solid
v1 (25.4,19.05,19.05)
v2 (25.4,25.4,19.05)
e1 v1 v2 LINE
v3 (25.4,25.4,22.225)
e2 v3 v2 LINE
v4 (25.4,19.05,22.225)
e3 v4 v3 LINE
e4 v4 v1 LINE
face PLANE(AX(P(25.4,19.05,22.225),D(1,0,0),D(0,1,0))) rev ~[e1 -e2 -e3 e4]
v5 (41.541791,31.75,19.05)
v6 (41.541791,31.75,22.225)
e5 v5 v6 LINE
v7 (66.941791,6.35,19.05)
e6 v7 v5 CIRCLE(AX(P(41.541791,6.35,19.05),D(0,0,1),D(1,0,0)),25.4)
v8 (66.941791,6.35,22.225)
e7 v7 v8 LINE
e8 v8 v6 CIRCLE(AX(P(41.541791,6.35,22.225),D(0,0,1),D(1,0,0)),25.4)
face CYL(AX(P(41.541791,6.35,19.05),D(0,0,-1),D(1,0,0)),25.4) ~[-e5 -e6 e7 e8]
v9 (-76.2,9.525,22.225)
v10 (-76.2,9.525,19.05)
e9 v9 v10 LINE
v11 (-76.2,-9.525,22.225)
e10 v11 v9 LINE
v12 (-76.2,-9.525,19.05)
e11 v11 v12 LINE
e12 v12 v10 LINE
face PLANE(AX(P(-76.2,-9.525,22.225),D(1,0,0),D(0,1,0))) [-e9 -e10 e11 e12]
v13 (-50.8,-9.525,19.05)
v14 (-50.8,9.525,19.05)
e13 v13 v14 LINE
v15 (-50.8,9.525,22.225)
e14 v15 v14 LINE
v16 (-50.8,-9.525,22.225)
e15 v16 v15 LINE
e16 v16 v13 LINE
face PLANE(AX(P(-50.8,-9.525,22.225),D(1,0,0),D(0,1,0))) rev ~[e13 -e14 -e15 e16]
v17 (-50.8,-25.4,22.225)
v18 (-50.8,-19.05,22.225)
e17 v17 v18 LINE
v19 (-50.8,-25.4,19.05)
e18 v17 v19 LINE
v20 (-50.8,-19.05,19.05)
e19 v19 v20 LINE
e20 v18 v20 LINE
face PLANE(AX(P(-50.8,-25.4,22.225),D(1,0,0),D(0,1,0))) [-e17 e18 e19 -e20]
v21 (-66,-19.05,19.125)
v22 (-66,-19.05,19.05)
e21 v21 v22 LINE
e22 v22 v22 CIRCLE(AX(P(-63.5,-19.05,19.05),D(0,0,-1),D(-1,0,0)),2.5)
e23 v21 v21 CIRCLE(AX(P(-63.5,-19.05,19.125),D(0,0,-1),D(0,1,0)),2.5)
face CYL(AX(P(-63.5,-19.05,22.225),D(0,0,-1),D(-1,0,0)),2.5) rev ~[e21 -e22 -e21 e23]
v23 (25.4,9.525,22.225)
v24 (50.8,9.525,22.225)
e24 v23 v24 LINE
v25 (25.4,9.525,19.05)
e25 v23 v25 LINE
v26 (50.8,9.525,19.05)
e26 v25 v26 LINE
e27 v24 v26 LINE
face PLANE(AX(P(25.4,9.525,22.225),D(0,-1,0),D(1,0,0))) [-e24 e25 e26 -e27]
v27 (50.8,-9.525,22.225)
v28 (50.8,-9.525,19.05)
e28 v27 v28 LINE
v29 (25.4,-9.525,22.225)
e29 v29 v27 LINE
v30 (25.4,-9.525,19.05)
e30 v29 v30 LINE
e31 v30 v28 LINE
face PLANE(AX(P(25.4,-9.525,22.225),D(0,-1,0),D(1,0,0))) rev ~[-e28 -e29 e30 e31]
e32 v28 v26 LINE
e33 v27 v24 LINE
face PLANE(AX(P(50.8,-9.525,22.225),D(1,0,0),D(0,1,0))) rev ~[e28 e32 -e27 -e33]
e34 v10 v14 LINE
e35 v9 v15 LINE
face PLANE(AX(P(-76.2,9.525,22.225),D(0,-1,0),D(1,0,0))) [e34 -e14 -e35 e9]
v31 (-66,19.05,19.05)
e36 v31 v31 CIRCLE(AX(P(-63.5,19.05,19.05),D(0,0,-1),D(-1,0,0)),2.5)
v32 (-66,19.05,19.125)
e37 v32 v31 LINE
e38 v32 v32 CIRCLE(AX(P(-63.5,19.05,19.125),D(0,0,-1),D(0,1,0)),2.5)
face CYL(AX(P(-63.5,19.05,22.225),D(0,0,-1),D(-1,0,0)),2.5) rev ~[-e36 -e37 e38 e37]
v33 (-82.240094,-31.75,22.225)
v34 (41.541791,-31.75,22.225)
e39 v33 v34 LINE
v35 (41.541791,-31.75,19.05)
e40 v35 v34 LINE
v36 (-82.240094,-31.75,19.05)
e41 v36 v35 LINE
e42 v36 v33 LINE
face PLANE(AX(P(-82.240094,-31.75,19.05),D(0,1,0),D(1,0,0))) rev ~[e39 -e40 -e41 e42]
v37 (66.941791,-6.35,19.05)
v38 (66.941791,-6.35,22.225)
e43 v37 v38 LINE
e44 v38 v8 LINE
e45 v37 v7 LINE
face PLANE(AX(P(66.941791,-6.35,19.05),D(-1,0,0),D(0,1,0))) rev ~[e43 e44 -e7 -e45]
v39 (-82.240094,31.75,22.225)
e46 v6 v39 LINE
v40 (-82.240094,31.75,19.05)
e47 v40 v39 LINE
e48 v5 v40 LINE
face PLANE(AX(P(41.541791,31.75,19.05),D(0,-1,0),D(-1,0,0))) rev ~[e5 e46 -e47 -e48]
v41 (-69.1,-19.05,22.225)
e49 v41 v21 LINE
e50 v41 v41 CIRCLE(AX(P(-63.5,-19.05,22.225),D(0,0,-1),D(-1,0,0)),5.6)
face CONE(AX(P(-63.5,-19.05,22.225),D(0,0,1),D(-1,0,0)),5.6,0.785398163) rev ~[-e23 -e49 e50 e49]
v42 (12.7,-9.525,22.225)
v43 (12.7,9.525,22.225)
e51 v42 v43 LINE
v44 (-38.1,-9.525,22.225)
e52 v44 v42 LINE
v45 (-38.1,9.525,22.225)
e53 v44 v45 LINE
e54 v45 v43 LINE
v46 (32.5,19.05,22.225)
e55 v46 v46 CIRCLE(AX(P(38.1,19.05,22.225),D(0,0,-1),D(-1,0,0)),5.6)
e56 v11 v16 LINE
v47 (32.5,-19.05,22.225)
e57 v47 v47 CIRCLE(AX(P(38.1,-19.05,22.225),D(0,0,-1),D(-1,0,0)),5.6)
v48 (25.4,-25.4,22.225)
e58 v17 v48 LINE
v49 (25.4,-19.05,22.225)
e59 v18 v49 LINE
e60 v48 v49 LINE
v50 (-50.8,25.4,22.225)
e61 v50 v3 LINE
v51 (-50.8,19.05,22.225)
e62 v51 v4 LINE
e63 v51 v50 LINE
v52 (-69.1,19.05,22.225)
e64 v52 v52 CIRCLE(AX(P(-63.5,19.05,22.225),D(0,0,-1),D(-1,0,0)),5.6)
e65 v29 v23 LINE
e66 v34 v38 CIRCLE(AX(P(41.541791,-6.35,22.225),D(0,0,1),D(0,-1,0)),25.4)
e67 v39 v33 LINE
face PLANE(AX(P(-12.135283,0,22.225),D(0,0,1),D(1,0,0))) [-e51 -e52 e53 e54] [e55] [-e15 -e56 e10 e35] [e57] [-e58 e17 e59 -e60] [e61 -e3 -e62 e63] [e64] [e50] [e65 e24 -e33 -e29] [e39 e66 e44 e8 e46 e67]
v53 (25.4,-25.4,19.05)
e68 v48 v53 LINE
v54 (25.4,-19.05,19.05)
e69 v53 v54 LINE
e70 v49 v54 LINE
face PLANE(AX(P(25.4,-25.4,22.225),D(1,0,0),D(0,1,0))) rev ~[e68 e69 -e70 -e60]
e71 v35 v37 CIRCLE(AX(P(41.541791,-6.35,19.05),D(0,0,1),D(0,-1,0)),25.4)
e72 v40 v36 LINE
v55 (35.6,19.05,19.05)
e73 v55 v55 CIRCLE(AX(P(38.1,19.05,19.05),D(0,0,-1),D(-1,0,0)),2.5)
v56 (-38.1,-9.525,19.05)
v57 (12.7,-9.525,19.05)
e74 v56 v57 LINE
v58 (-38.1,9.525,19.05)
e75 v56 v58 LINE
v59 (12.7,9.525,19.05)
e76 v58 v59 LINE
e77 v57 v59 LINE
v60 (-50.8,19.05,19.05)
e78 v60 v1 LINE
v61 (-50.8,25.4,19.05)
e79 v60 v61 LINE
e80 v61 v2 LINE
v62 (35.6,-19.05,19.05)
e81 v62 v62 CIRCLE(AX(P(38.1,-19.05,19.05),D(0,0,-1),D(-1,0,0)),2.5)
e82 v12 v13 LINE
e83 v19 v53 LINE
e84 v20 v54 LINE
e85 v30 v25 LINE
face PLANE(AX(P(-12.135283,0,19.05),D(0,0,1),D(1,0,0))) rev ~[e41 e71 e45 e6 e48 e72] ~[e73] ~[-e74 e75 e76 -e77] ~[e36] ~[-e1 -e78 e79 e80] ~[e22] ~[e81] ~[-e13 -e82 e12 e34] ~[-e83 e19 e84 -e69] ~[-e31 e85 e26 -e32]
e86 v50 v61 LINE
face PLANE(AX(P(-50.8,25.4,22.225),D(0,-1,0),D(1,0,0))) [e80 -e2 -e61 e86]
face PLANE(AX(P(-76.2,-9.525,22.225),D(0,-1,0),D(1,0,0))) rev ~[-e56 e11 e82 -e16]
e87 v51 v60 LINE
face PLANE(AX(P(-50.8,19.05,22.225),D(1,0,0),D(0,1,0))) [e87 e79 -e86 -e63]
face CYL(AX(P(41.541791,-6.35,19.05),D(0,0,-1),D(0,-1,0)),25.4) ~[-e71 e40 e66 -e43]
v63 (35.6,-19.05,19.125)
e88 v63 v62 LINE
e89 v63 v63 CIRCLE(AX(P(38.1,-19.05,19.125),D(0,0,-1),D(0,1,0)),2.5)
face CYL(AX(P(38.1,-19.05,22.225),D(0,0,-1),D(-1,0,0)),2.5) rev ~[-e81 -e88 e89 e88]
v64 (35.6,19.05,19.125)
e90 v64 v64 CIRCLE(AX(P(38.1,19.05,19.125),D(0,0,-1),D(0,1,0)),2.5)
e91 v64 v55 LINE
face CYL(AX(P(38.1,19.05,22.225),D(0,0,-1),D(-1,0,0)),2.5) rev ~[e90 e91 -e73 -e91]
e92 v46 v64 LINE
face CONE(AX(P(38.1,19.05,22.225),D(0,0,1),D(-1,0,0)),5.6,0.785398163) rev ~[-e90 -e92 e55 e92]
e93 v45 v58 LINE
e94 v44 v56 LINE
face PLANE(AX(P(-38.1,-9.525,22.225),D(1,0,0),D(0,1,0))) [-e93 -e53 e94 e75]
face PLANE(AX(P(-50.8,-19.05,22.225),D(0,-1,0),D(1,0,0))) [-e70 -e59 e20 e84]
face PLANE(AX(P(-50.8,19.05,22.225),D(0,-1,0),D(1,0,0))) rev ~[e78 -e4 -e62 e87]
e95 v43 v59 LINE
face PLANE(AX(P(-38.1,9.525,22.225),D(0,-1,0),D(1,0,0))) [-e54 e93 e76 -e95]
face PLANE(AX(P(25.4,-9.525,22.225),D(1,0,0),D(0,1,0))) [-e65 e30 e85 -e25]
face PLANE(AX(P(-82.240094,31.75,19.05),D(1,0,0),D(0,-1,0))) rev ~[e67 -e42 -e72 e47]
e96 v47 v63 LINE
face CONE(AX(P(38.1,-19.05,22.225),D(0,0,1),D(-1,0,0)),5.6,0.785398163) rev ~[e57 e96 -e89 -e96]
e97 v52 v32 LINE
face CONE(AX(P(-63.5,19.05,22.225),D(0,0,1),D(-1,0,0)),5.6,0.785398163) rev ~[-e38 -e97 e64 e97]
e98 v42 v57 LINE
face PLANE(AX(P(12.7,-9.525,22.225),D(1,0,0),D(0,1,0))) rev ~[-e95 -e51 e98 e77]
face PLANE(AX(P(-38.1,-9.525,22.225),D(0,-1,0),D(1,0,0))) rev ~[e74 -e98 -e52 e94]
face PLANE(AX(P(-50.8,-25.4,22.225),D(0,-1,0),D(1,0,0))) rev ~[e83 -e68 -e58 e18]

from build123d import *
from build123d import SkipClean  # not in build123d's __all__

# Parameters (mm, degrees)
F1_DEPTH        = 31.75
F1_DEPTH_BACK   = 31.75
F3_R            = 6.35
F4_DEPTH        = 149.1828857926
F5_R            = 12.7
F6_DEPTH        = 25.4
F7_R            = 9.525
F8_DEPTH        = 44.45
F8_DEPTH_BACK   = 66.9427915833
F10_D           = 4.2
F10_DEPTH       = 25.4
F10_TIP         = 1.2618073
F12_DEPTH       = 3.175
F14_D           = 5
F14_CSINK_D     = 11.2
F14_CSINK_ANGLE = 90
F15_W           = 25.4
F15_H           = 19.05
F15_W_2         = 76.2
F15_H_2         = 6.35
F15_W_3         = 50.8
F16_DEPTH       = 41.2760001


# Not quite as in the source:
# - a feature of the source that left no trace in its solid (it failed there, or was rolled back) is left out


with BuildPart() as f1:
    # F0 (on Front) → F1 (new body, two sides)
    with BuildSketch(Plane.XZ) as f1_sk:
        with BuildLine():
            Line((66.9417914833, 19.05), (-82.2400942093, 19.05))
            Line((-82.2400942093, 19.05), (-82.2400942093, -19.05))
            add(Edge.make_bspline(
                [(-82.2400942093, -19.05), (0, -19.05), (66.9417914833, -19.05), (66.9417914833, 19.05)],
                knots=[0, 0, 0, 0, 153.970273166, 153.970273166, 153.970273166, 153.970273166], degree=3))
        make_face()
    extrude(amount=F1_DEPTH)
    extrude(f1_sk.sketch, amount=-F1_DEPTH_BACK)

    # F3 (on face) → F4 (cut, through all)
    with BuildSketch(Plane(origin=(-82.2400942093, 0, 0), x_dir=(0, -1, 0), z_dir=(-1, 0, 0))):
        Circle(F3_R)
    extrude(amount=-F4_DEPTH, mode=Mode.SUBTRACT)

    # F5 (on face) → F6 (cut)
    with BuildSketch(Plane(origin=(-82.2400942093, 0, 0), x_dir=(0, -1, 0), z_dir=(-1, 0, 0))):
        Circle(F5_R)
    extrude(amount=-F6_DEPTH, mode=Mode.SUBTRACT)

    # F7 (on Right) → F8 (cut, two sides)
    with BuildSketch(Plane.YZ) as f8_sk:
        Circle(F7_R)
    extrude(amount=-F8_DEPTH, mode=Mode.SUBTRACT)
    extrude(f8_sk.sketch, amount=F8_DEPTH_BACK, mode=Mode.SUBTRACT)

    # F10
    with Locations(Plane.XY.offset(19.05)):
        with Locations((-63.5, 19.05), (-63.5, -19.05), (25.4, 19.05), (25.4, -19.05)):
            Hole(F10_D / 2, depth=F10_DEPTH)
            with Locations((0, 0, -(F10_DEPTH + F10_TIP / 2))):  # 118° drill point
                Cone(0, F10_D / 2, F10_TIP, mode=Mode.SUBTRACT)


with BuildPart() as f12:
    # F11 (on face) → F12 (new body)
    with BuildSketch(Plane.XY.offset(19.05)):
        with BuildLine():
            Line((41.5417914833, 31.75), (-82.2400942093, 31.75))
            Line((-82.2400942093, 31.75), (-82.2400942093, -31.75))
            Line((-82.2400942093, -31.75), (41.5417914833, -31.75))
            ThreePointArc((41.5417914833, -31.75), (59.5023037254, -24.3105122421), (66.9417914833, -6.35))
            Line((66.9417914833, -6.35), (66.9417914833, 6.35))
            ThreePointArc((66.9417914833, 6.35), (59.5023037254, 24.3105122421), (41.5417914833, 31.75))
        make_face()
    extrude(amount=F12_DEPTH)

    # F14 (through all)
    with Locations(Plane.XY.offset(22.225)):
        with Locations((-63.5, 19.05), (-63.5, -19.05), (38.1, -19.05), (38.1, 19.05)):
            CounterSinkHole(F14_D / 2, F14_CSINK_D / 2, counter_sink_angle=F14_CSINK_ANGLE)


with BuildPart() as f16_tool:
    # F15 (on face) → F16 (new body, through all)
    with BuildSketch(Plane.XY.offset(22.225)):
        with Locations((-63.5, 0)):
            Rectangle(F15_W, F15_H)
        with Locations((38.1, 0)):
            Rectangle(F15_W, F15_H)
        with Locations((-12.7, 22.225)):
            Rectangle(F15_W_2, F15_H_2)
        with Locations((-12.7, -22.225)):
            Rectangle(F15_W_2, F15_H_2)
        with Locations((-12.7, 0)):
            Rectangle(F15_W_3, F15_H)
    extrude(amount=-F16_DEPTH)


with BuildPart() as f1_1:
    add(f1.part, clean=False)

    # F16: cut by f16_tool
    with SkipClean():  # cleaning this boolean's faces spoils the solid; the shape is the same uncleaned
        add(f16_tool.part, mode=Mode.SUBTRACT)


with BuildPart() as f12_1:
    add(f12.part, clean=False)

    # F16: cut by f16_tool
    with SkipClean():  # cleaning this boolean's faces spoils the solid; the shape is the same uncleaned
        add(f16_tool.part, mode=Mode.SUBTRACT)


solid = f12_1.part
